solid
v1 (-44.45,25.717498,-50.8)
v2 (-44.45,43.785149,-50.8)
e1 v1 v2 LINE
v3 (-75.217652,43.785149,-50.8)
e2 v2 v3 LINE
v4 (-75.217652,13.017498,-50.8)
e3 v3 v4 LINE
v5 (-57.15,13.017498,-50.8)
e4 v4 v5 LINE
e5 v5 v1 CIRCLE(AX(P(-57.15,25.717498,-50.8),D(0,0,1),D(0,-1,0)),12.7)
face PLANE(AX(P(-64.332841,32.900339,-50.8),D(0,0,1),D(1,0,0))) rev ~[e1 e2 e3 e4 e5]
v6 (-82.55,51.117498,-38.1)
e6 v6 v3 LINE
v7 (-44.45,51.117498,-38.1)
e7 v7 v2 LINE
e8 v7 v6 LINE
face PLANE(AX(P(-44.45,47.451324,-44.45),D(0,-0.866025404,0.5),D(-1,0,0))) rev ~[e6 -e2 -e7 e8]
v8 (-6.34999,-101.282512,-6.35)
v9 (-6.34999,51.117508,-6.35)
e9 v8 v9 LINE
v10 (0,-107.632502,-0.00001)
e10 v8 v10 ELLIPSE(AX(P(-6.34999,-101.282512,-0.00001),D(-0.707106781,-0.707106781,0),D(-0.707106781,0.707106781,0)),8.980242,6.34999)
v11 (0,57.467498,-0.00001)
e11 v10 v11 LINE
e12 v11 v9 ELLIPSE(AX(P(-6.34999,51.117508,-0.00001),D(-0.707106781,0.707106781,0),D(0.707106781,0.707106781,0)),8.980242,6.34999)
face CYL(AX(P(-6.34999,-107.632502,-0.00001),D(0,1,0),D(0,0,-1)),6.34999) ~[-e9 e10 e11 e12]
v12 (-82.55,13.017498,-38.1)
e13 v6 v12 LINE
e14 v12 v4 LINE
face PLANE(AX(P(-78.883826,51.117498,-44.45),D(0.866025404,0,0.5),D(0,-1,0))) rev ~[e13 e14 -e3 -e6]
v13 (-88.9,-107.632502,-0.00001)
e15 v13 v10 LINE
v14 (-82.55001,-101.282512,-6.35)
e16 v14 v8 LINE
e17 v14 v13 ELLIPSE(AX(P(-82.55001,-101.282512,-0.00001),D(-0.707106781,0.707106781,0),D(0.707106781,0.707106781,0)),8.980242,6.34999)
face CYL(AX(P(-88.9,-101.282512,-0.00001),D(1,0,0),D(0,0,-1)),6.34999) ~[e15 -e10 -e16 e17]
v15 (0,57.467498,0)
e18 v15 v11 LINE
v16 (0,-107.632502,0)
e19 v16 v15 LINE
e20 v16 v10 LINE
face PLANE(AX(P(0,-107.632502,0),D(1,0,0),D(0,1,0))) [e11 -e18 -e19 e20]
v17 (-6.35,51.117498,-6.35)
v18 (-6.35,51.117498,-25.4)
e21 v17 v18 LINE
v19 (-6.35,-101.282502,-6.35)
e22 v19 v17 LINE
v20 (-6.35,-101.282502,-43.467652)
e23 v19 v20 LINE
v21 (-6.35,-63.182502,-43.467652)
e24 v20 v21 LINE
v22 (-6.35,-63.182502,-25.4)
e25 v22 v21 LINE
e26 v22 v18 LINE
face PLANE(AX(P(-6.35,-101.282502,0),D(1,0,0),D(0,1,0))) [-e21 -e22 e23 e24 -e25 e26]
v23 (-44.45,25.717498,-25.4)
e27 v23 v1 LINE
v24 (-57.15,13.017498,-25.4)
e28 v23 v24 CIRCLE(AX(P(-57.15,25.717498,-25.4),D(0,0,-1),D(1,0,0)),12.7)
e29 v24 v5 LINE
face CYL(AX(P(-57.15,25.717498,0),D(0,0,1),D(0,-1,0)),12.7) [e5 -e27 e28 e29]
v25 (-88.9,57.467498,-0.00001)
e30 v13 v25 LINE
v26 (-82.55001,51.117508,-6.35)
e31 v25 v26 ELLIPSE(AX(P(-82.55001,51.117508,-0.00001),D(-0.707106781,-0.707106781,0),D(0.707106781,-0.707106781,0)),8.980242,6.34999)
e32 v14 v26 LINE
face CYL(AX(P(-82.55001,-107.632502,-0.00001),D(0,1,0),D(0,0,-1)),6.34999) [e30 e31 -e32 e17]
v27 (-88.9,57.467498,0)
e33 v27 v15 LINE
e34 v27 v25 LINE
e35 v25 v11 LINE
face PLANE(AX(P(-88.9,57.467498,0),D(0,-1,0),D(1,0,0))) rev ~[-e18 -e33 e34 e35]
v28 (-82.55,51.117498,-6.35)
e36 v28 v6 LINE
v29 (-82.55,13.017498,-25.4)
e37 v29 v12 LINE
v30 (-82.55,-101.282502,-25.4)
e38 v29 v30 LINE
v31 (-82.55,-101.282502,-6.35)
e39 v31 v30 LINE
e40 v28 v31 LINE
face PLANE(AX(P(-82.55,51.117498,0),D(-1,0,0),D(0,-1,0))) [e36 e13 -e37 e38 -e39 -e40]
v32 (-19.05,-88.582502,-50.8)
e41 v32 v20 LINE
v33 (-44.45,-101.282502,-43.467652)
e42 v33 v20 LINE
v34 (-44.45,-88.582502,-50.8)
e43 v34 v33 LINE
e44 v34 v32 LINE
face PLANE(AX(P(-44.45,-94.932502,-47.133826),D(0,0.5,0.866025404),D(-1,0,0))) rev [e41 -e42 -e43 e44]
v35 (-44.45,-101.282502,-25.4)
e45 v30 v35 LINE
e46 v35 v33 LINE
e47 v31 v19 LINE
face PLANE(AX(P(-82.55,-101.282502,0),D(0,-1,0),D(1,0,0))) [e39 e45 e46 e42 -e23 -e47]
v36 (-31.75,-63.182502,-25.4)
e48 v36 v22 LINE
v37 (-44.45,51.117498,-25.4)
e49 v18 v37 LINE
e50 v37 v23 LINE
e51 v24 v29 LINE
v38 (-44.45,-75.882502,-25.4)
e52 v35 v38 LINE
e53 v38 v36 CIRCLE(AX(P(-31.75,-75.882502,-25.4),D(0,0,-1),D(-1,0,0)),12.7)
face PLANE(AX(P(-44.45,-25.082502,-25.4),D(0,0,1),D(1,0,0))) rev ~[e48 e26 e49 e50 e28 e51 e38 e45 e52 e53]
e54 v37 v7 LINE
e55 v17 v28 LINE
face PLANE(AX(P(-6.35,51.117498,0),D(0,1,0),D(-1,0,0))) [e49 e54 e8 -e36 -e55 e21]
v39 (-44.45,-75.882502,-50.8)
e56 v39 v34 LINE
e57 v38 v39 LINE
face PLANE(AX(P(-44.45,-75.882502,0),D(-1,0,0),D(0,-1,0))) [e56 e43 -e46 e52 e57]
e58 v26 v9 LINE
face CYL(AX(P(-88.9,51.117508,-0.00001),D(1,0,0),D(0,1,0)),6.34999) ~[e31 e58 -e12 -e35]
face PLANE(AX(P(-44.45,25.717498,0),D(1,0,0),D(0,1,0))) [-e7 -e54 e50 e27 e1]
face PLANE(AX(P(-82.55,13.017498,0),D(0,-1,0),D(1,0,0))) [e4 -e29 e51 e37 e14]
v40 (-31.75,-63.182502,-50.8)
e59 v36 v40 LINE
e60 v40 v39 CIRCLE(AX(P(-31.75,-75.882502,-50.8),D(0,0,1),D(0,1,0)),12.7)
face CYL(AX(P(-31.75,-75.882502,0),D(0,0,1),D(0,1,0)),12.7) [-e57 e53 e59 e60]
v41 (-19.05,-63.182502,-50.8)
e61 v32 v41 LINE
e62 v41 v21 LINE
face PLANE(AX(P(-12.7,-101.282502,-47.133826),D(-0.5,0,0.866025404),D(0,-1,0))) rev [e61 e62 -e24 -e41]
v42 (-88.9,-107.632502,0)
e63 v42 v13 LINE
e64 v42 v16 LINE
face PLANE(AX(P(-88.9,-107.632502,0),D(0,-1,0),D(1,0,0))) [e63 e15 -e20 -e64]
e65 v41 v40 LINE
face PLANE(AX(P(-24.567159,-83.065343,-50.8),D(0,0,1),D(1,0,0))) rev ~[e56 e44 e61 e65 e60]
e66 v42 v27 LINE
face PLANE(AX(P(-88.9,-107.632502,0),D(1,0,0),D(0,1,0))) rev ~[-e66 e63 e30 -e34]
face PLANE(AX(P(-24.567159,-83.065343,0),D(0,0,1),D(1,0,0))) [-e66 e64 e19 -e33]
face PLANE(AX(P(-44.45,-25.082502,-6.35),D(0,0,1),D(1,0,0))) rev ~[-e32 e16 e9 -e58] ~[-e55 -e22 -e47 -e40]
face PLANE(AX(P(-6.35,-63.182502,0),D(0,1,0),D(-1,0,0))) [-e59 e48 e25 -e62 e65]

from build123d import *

# Parameters (mm, degrees)
F0_W     = 88.9
F0_H     = 165.1
F1_DEPTH = 6.35
F2_DEPTH = 25.4
F3_DEPTH = 50.8
F4_R     = 6.34999
F5_SIZE2 = 7.3323484187
F5_SIZE  = 12.7
F6_SIZE2 = 7.3323484187
F6_SIZE  = 12.7


# Not quite as in the source:
# - a fillet or chamfer is up to 0.001 mm smaller than in the source, because OpenCascade refuses the exact size


with BuildPart() as f1:
    # F0 (on Top) → F1 (new body)
    with BuildSketch(Plane.XY):
        with Locations((-44.4500000971, -25.0825021148)):
            Rectangle(F0_W, F0_H)
        Polygon((-82.5500000971, 13.0174978852), (-82.5500000971, 51.1174978852), (-44.4500000971, 51.1174978852), (-6.3500000971, 51.1174978852), (-6.3500000971, -63.1825021148), (-6.3500000971, -101.2825021148), (-44.4500000971, -101.2825021148), (-82.5500000971, -101.2825021148), align=None, mode=Mode.SUBTRACT)
        with BuildLine():
            Line((-6.3500000971, 51.1174978852), (-44.4500000971, 51.1174978852))
            Line((-44.4500000971, 51.1174978852), (-44.4500000971, 25.7174978852))
            ThreePointArc((-44.4500000971, 25.7174978852), (-48.169743976, 16.7372417642), (-57.1500000971, 13.0174978852))
            Line((-57.1500000971, 13.0174978852), (-82.5500000971, 13.0174978852))
            Line((-82.5500000971, 13.0174978852), (-82.5500000971, -101.2825021148))
            Line((-82.5500000971, -101.2825021148), (-44.4500000971, -101.2825021148))
            Line((-44.4500000971, -101.2825021148), (-44.4500000971, -75.8825021148))
            ThreePointArc((-44.4500000971, -75.8825021148), (-40.7302562182, -66.9022459937), (-31.7500000971, -63.1825021148))
            Line((-31.7500000971, -63.1825021148), (-6.3500000971, -63.1825021148))
            Line((-6.3500000971, -63.1825021148), (-6.3500000971, 51.1174978852))
        make_face()
        with BuildLine():
            Line((-6.3500000971, -101.2825021148), (-6.3500000971, -63.1825021148))
            Line((-6.3500000971, -63.1825021148), (-31.7500000971, -63.1825021148))
            ThreePointArc((-31.7500000971, -63.1825021148), (-40.7302562182, -66.9022459937), (-44.4500000971, -75.8825021148))
            Line((-44.4500000971, -75.8825021148), (-44.4500000971, -101.2825021148))
            Line((-44.4500000971, -101.2825021148), (-6.3500000971, -101.2825021148))
        make_face()
        with BuildLine():
            Line((-44.4500000971, 51.1174978852), (-82.5500000971, 51.1174978852))
            Line((-82.5500000971, 51.1174978852), (-82.5500000971, 13.0174978852))
            Line((-82.5500000971, 13.0174978852), (-57.1500000971, 13.0174978852))
            ThreePointArc((-57.1500000971, 13.0174978852), (-48.169743976, 16.7372417642), (-44.4500000971, 25.7174978852))
            Line((-44.4500000971, 25.7174978852), (-44.4500000971, 51.1174978852))
        make_face()
    extrude(amount=-F1_DEPTH)

    # F0 (on Top) → F2 (join)
    with BuildSketch(Plane.XY):
        with BuildLine():
            Line((-6.3500000971, 51.1174978852), (-44.4500000971, 51.1174978852))
            Line((-44.4500000971, 51.1174978852), (-44.4500000971, 25.7174978852))
            ThreePointArc((-44.4500000971, 25.7174978852), (-48.169743976, 16.7372417642), (-57.1500000971, 13.0174978852))
            Line((-57.1500000971, 13.0174978852), (-82.5500000971, 13.0174978852))
            Line((-82.5500000971, 13.0174978852), (-82.5500000971, -101.2825021148))
            Line((-82.5500000971, -101.2825021148), (-44.4500000971, -101.2825021148))
            Line((-44.4500000971, -101.2825021148), (-44.4500000971, -75.8825021148))
            ThreePointArc((-44.4500000971, -75.8825021148), (-40.7302562182, -66.9022459937), (-31.7500000971, -63.1825021148))
            Line((-31.7500000971, -63.1825021148), (-6.3500000971, -63.1825021148))
            Line((-6.3500000971, -63.1825021148), (-6.3500000971, 51.1174978852))
        make_face()
    extrude(amount=-F2_DEPTH)

    # F0 (on Top) → F3 (join)
    with BuildSketch(Plane.XY):
        with BuildLine():
            Line((-6.3500000971, -101.2825021148), (-6.3500000971, -63.1825021148))
            Line((-6.3500000971, -63.1825021148), (-31.7500000971, -63.1825021148))
            ThreePointArc((-31.7500000971, -63.1825021148), (-40.7302562182, -66.9022459937), (-44.4500000971, -75.8825021148))
            Line((-44.4500000971, -75.8825021148), (-44.4500000971, -101.2825021148))
            Line((-44.4500000971, -101.2825021148), (-6.3500000971, -101.2825021148))
        make_face()
        with BuildLine():
            Line((-44.4500000971, 51.1174978852), (-82.5500000971, 51.1174978852))
            Line((-82.5500000971, 51.1174978852), (-82.5500000971, 13.0174978852))
            Line((-82.5500000971, 13.0174978852), (-57.1500000971, 13.0174978852))
            ThreePointArc((-57.1500000971, 13.0174978852), (-48.169743976, 16.7372417642), (-44.4500000971, 25.7174978852))
            Line((-44.4500000971, 25.7174978852), (-44.4500000971, 51.1174978852))
        make_face()
    extrude(amount=-F3_DEPTH)

    # F4 (radius 6.35 in the source; OpenCascade refuses exactly that, so slightly less here)
    f4_edges = [f1.edges().sort_by_distance(p)[0] for p in [
        (-44.45, 57.467498, -6.35),
        (0, -25.082502, -6.35),
        (-44.45, -107.632502, -6.35),
        (-88.9, -25.082502, -6.35),
    ]]
    fillet(f4_edges, radius=F4_R)

    # F5
    f5_edges = [f1.edges().sort_by_distance(p)[0] for p in [
        (-6.35, -82.232502, -50.8),
        (-25.4, -101.282502, -50.8),
    ]]
    f5_side = f1.faces().sort_by_distance((-25.003958, -82.628544, -50.8))[0]
    chamfer(f5_edges, length=F5_SIZE, length2=F5_SIZE2, reference=f5_side)

    # F6
    f6_edges = [f1.edges().sort_by_distance(p)[0] for p in [
        (-82.55, 32.067498, -50.8),
        (-63.5, 51.117498, -50.8),
    ]]
    chamfer(f6_edges, length=F6_SIZE, length2=F6_SIZE2)


solid = f1.part
